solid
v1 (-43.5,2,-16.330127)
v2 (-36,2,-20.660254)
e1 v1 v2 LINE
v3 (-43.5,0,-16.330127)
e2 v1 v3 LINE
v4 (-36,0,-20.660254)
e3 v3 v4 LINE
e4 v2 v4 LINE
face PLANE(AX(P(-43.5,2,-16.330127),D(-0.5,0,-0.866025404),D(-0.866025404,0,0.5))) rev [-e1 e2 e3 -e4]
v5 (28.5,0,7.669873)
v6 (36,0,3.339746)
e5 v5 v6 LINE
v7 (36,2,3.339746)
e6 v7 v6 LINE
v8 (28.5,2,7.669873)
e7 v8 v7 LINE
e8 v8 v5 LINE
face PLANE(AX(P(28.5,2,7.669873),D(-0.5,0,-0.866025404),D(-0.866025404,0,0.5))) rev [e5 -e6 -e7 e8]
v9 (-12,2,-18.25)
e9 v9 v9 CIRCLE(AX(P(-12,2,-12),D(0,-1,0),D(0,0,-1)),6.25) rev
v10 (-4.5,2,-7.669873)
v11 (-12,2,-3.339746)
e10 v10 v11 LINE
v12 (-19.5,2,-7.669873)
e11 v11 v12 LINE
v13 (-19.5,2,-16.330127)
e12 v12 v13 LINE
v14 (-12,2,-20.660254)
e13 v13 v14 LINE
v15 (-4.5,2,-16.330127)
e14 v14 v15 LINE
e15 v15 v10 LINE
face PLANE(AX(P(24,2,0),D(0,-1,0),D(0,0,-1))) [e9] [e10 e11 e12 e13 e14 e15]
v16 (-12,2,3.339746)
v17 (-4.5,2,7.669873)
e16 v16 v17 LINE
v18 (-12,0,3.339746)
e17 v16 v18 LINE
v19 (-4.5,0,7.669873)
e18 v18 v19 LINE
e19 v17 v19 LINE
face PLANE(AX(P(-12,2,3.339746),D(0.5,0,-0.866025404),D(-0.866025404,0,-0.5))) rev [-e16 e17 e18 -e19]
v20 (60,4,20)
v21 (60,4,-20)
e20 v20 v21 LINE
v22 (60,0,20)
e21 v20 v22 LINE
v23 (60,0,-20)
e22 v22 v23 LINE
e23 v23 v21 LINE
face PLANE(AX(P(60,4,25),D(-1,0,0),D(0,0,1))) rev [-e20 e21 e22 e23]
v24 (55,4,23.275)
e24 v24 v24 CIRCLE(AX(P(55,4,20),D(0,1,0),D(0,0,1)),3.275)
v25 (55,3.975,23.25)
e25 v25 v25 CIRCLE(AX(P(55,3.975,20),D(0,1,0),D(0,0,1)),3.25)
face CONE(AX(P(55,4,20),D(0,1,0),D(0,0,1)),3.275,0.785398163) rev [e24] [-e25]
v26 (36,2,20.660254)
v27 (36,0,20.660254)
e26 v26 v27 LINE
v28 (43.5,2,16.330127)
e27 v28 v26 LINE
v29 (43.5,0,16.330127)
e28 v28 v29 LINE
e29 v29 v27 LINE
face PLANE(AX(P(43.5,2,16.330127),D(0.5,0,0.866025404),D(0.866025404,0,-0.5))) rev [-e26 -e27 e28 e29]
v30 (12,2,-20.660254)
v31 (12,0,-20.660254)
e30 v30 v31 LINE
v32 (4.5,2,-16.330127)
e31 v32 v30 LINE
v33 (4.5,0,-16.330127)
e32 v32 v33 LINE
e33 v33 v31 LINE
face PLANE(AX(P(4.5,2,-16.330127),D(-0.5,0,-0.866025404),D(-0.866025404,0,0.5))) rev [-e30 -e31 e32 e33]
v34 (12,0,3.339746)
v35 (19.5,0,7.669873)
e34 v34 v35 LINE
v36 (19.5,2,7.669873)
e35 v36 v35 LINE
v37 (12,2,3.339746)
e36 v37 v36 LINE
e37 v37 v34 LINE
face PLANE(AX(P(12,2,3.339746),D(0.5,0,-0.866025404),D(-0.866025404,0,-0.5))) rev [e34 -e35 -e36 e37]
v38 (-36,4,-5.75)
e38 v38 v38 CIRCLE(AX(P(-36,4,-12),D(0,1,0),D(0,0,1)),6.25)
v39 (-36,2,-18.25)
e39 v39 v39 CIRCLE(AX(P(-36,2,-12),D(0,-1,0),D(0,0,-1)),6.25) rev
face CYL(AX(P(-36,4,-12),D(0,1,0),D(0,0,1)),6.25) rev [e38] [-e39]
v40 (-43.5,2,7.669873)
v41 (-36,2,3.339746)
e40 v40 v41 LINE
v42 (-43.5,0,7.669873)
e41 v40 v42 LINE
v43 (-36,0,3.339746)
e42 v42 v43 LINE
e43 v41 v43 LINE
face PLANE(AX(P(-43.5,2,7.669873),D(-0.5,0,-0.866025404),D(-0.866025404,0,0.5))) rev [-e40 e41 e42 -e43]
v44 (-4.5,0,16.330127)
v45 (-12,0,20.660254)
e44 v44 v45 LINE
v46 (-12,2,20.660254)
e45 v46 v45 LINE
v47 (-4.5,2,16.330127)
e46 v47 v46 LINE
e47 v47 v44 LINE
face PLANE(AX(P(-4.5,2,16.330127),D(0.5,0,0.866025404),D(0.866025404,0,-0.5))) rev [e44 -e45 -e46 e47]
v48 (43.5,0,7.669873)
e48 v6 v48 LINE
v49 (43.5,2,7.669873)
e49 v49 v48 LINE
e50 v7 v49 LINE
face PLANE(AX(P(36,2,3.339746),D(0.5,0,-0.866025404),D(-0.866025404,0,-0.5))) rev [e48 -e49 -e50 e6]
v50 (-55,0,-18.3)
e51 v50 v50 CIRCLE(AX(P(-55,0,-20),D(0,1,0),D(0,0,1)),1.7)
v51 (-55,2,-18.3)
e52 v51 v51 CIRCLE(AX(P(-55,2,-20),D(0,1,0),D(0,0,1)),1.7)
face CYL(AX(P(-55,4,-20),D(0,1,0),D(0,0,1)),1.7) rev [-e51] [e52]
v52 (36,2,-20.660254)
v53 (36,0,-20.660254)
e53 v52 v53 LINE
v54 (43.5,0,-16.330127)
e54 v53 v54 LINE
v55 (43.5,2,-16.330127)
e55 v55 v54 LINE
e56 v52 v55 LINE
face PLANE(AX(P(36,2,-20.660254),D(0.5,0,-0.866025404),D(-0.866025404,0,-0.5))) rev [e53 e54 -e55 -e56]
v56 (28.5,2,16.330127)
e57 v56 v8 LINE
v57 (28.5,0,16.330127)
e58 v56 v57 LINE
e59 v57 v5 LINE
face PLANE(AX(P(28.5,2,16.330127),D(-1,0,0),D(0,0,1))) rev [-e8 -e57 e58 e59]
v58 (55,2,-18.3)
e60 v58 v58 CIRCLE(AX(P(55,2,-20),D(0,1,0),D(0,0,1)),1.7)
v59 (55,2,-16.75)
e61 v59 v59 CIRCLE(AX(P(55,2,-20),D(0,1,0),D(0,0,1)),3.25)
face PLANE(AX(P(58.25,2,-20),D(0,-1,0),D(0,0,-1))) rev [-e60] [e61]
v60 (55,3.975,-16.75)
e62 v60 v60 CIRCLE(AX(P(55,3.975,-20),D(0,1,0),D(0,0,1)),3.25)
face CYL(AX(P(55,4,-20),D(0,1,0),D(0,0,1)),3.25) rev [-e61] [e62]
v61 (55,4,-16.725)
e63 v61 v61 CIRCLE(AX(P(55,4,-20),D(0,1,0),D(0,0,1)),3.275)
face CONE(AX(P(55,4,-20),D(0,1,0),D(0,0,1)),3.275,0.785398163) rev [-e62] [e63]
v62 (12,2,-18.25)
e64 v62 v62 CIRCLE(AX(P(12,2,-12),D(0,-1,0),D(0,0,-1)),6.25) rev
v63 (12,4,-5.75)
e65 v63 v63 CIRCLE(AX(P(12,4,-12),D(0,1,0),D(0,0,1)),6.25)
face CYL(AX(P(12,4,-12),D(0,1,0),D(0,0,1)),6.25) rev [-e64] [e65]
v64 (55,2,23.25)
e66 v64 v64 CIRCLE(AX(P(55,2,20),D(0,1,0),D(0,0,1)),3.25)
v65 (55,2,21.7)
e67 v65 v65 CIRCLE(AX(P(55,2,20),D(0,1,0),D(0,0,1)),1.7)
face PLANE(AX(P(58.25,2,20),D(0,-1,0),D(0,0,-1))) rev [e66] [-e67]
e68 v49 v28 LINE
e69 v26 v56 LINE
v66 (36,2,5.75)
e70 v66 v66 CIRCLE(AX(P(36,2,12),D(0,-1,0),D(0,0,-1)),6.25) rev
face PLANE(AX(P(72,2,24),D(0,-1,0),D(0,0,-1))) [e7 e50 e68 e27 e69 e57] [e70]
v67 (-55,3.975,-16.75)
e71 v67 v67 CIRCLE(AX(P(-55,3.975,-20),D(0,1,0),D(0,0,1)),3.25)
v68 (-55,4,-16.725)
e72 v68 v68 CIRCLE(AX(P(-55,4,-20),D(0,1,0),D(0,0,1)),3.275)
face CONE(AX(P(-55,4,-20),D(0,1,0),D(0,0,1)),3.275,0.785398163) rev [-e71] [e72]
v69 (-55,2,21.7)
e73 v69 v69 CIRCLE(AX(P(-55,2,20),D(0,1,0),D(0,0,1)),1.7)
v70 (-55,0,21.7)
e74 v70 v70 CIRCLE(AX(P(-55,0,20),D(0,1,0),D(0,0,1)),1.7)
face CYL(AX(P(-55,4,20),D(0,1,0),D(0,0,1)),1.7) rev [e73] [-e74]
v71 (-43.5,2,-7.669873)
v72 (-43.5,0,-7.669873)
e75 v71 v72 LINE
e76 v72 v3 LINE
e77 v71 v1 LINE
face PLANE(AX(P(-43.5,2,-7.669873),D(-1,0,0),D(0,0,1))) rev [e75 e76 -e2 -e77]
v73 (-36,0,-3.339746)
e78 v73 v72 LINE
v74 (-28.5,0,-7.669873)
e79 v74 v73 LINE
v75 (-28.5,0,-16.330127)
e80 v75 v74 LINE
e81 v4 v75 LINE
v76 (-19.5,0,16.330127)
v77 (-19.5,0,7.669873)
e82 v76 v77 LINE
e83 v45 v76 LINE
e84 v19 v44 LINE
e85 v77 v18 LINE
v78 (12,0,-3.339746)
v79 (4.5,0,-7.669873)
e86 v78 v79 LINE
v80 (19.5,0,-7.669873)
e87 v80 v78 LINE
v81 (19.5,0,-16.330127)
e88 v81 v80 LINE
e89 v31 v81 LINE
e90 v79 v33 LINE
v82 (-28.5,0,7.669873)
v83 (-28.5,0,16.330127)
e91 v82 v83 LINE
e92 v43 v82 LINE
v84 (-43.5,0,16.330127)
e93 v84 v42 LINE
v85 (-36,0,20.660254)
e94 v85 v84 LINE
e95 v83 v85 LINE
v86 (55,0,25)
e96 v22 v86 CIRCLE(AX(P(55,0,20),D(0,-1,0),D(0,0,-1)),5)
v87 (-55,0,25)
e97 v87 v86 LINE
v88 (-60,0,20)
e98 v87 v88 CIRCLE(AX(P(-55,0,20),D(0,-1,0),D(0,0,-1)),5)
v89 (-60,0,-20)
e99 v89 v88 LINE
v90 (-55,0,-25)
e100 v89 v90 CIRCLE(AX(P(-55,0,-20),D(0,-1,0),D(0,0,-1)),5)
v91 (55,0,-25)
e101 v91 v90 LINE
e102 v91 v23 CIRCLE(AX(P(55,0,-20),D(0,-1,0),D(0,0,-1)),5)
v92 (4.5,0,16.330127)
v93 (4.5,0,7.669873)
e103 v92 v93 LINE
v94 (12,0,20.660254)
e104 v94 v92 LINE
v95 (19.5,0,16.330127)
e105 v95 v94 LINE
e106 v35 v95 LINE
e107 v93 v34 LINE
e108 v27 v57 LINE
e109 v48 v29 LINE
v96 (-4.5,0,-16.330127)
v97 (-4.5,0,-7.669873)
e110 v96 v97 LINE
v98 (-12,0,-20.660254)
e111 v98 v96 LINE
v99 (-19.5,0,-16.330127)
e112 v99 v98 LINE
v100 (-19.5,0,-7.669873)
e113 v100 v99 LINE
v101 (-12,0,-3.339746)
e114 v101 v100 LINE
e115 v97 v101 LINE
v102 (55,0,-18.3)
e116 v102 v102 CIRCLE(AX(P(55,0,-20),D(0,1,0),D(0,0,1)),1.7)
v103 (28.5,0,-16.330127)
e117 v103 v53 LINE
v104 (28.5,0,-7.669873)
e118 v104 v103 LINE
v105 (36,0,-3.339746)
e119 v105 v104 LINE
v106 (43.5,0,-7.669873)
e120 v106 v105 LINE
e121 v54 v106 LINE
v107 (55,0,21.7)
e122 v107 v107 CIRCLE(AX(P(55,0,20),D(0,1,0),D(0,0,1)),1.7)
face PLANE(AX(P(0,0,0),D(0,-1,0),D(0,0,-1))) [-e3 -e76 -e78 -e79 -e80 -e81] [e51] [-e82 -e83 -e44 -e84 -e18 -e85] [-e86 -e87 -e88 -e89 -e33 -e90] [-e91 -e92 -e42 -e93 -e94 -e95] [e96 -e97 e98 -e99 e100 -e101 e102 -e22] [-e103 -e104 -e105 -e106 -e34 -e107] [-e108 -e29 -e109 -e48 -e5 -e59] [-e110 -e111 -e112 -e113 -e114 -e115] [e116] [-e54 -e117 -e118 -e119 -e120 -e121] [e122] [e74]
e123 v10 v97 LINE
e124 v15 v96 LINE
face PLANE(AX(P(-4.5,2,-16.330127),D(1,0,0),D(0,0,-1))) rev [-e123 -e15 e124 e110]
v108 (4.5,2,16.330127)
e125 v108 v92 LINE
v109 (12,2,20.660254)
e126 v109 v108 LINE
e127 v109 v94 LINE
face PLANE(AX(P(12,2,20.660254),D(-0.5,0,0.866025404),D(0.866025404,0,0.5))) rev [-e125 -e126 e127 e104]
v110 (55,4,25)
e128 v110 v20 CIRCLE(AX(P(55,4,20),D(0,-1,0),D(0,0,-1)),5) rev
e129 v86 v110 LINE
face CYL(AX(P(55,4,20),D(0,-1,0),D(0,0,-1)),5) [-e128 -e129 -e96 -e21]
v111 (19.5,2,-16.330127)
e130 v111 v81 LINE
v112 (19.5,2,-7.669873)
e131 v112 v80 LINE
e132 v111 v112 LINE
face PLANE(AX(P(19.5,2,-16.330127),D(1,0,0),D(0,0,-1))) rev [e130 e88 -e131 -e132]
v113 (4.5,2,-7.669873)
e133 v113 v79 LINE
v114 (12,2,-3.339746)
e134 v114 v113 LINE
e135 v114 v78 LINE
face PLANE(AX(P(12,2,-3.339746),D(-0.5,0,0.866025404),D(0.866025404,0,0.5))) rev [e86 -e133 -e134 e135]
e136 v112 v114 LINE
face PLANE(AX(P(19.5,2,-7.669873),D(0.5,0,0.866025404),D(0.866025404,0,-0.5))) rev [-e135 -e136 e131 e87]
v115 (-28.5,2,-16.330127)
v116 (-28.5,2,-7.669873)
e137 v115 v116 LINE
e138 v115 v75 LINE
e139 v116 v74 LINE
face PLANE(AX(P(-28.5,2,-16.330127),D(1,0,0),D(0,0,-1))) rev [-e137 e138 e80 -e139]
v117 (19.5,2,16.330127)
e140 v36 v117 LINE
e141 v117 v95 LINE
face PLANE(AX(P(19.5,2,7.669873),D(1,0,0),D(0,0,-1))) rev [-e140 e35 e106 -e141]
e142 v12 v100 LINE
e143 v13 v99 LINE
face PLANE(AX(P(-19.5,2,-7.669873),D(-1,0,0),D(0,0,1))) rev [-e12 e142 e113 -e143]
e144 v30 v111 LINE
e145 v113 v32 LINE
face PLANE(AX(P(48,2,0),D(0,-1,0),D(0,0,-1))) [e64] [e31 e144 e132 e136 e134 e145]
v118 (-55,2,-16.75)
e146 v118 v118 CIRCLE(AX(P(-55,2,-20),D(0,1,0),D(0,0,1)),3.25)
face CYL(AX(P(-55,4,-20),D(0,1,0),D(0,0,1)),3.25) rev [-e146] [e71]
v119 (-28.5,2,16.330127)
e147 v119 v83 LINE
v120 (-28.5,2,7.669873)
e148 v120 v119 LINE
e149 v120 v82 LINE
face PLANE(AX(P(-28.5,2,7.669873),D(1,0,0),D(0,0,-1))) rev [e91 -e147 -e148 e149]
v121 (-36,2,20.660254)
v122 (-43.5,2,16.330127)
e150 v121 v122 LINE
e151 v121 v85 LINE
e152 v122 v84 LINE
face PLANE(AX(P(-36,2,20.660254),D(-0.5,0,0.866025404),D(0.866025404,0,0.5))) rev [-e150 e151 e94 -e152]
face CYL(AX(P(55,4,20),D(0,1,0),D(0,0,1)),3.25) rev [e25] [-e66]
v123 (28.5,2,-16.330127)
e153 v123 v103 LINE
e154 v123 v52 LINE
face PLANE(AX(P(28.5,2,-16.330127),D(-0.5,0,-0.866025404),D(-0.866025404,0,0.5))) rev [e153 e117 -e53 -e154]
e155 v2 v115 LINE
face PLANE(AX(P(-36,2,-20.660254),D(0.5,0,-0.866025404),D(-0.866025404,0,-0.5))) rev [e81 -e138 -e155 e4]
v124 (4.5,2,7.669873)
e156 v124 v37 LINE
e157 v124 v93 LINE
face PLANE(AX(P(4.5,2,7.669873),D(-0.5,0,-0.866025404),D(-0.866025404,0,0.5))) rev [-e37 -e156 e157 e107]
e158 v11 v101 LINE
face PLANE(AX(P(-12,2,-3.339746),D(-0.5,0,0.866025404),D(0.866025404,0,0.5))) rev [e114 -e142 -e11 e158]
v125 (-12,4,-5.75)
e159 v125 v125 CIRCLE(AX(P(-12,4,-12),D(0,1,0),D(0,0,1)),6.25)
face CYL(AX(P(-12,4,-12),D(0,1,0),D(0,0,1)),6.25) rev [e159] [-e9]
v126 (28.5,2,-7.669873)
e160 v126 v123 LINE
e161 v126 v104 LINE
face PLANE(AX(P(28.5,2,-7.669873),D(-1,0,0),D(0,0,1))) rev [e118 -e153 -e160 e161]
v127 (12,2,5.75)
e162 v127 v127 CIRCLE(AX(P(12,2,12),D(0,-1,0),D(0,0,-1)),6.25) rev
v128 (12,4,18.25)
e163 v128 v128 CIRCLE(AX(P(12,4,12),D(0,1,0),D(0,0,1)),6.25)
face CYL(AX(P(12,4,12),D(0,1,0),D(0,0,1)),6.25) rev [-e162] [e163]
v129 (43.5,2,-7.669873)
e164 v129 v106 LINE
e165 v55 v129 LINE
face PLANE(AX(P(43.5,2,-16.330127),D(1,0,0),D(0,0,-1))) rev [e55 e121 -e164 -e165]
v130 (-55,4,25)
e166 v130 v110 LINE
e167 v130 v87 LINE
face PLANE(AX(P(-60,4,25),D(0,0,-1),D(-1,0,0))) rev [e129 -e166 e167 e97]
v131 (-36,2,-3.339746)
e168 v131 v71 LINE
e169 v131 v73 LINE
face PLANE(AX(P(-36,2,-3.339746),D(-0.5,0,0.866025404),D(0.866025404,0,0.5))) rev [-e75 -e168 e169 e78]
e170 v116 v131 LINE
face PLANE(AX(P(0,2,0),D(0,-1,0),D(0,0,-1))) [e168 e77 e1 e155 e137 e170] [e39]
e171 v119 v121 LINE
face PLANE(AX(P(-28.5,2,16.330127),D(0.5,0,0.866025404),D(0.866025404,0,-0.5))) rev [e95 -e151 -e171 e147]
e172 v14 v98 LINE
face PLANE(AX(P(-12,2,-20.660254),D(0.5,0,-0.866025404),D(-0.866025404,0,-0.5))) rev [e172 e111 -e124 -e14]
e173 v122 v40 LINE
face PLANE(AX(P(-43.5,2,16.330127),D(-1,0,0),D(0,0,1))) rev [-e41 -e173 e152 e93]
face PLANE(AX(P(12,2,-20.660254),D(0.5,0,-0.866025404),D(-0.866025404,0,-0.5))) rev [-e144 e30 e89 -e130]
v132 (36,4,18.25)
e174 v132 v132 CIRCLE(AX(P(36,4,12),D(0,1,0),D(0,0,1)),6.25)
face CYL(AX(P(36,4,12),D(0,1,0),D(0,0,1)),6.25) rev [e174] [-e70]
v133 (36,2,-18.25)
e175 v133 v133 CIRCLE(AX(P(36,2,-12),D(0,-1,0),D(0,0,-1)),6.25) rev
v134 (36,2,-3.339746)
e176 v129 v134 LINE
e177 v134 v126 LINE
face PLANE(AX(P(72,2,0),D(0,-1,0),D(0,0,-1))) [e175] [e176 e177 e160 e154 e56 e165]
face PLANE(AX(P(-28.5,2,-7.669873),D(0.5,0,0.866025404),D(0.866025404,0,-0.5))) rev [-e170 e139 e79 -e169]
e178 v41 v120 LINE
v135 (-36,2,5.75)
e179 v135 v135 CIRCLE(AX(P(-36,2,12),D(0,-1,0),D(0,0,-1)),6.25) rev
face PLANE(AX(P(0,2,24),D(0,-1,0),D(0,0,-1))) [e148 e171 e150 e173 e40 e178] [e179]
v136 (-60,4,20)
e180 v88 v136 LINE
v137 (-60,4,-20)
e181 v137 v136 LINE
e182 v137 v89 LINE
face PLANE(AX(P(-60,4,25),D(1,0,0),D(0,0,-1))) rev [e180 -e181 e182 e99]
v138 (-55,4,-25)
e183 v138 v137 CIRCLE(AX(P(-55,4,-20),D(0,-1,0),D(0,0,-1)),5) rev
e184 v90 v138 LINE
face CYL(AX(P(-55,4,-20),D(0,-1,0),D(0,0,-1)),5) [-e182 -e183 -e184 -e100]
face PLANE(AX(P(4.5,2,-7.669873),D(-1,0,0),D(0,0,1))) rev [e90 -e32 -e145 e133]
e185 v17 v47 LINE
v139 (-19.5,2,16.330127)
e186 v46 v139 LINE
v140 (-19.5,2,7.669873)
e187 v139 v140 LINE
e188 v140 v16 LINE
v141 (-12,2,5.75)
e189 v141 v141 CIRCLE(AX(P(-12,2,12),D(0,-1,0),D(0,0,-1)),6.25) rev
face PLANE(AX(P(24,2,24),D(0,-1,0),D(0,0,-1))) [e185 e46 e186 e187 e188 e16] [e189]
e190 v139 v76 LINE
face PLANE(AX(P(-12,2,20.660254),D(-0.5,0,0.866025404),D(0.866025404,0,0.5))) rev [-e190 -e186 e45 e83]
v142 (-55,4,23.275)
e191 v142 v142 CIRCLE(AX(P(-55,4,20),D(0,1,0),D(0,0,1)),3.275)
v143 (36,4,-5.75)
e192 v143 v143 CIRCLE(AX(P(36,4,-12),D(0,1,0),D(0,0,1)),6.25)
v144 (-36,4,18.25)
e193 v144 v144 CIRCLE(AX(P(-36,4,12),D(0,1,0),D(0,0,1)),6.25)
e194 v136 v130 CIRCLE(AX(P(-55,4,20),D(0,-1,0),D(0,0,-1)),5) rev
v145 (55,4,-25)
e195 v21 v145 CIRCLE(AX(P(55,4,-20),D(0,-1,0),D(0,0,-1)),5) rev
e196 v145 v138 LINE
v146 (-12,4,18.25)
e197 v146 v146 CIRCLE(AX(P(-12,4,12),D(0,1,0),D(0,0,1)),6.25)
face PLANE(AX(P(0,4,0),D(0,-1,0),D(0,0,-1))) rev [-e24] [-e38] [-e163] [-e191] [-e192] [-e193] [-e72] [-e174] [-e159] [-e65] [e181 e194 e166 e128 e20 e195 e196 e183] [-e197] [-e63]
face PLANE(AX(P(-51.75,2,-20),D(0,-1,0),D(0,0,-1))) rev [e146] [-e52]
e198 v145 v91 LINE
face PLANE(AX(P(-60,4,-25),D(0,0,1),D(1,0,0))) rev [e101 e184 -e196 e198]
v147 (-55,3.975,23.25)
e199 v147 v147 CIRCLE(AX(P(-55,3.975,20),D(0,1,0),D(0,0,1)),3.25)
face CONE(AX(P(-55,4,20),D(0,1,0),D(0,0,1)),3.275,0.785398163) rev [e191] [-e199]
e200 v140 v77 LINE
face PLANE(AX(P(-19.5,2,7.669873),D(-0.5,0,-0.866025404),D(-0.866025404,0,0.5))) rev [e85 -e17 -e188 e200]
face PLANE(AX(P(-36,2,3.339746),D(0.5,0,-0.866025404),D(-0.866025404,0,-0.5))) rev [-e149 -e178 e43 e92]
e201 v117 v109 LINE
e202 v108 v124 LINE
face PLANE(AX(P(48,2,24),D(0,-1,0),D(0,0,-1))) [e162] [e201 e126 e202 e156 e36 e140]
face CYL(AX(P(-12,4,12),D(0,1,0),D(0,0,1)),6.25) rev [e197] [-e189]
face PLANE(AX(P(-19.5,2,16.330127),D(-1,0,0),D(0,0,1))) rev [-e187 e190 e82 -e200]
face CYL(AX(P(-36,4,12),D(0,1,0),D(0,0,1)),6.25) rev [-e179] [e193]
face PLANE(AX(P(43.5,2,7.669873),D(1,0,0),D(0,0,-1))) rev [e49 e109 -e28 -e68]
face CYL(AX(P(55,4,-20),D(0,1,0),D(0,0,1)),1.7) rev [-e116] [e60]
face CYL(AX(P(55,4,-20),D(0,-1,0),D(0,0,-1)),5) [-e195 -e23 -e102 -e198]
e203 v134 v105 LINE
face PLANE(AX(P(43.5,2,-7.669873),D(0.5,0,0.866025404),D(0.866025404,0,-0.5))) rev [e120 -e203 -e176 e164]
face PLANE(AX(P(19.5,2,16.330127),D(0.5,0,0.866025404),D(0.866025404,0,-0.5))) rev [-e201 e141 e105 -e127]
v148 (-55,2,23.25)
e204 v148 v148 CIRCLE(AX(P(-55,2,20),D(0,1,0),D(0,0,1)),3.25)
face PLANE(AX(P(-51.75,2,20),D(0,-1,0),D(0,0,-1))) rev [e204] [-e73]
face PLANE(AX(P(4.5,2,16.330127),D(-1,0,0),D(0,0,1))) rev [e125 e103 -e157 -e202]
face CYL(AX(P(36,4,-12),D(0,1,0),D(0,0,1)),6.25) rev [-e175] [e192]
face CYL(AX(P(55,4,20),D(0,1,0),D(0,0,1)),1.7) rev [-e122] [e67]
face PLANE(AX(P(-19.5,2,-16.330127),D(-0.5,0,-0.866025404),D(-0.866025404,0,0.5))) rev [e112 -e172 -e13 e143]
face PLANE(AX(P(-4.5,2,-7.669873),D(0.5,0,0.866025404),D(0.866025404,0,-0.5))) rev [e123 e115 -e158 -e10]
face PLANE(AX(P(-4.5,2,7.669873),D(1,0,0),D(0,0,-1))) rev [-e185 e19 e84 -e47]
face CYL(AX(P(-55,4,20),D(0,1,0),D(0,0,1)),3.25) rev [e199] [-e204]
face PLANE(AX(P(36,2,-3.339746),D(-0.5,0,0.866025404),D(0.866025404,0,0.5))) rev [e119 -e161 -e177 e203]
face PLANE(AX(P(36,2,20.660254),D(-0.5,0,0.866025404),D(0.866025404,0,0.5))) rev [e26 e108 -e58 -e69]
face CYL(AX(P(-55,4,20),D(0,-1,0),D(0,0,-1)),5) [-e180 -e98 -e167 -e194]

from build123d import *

# Parameters (mm, degrees)
SKETCH1_W               = 120
SKETCH1_H               = 50
BODY_DEPTH              = 4
EDGE_FILLETS_R          = 5
GX12_HOLE_D             = 12.5
GX12_NUT_CUT_DEPTH      = 2
GX12_PATTERN_COUNT      = 4
GX12_PATTERN_PITCH      = 24
GX12_PATTERN_COUNT_DIR2 = 2
GX12_PATTERN_PITCH_DIR2 = 24


# Read off the part's stored shape, not the designer's step: mounting_holes
with BuildPart() as part:
    # Sketch1 → body (new body)
    with BuildSketch(Plane(origin=(0, 0, 0), x_dir=(1, 0, 0), z_dir=(0, 1, 0))):
        Rectangle(SKETCH1_W, SKETCH1_H)
    extrude(amount=BODY_DEPTH)

    # mounting_holes outline → mounting_holes (revolve, cut)
    with BuildSketch(Plane(origin=(55, 0, 20), x_dir=(1, 0, 0), z_dir=(0, 0, 1))):
        Polygon((0, 0), (1.7, 0), (1.7, 2), (3.25, 2), (3.25, 3.975), (3.275, 4), (0, 4), align=None)
    revolve(axis=Axis((55, 0, 20), (0, 1, 0)), mode=Mode.SUBTRACT)

    # mounting_holes 2 outline → mounting_holes 2 (revolve, cut)
    with BuildSketch(Plane(origin=(-55, 0, -20), x_dir=(1, 0, 0), z_dir=(0, 0, 1))):
        Polygon((0, 4), (0, 0), (1.7, 0), (1.7, 2), (3.25, 2), (3.25, 3.975), (3.275, 4), align=None)
    revolve(axis=Axis((-55, 0, -20), (0, 1, 0)), mode=Mode.SUBTRACT)

    # mounting_holes 3 outline → mounting_holes 3 (revolve, cut)
    with BuildSketch(Plane(origin=(55, 0, -20), x_dir=(1, 0, 0), z_dir=(0, 0, 1))):
        Polygon((0, 4), (0, 0), (1.7, 0), (1.7, 2), (3.25, 2), (3.25, 3.975), (3.275, 4), align=None)
    revolve(axis=Axis((55, 0, -20), (0, 1, 0)), mode=Mode.SUBTRACT)

    # mounting_holes 4 outline → mounting_holes 4 (revolve, cut)
    with BuildSketch(Plane(origin=(-55, 0, 20), x_dir=(1, 0, 0), z_dir=(0, 0, 1))):
        Polygon((0, 4), (0, 0), (1.7, 0), (1.7, 2), (3.25, 2), (3.25, 3.975), (3.275, 4), align=None)
    revolve(axis=Axis((-55, 0, 20), (0, 1, 0)), mode=Mode.SUBTRACT)

    # edge_fillets
    edge_fillets_edges = [part.edges().sort_by_distance(p)[0] for p in [
        (60, 2, 25),
        (-60, 2, 25),
        (-60, 2, -25),
        (60, 2, -25),
    ]]
    fillet(edge_fillets_edges, radius=EDGE_FILLETS_R)

    # gx12_hole (through all)
    with Locations(Plane(origin=(0, 4, 0), x_dir=(1, 0, 0), z_dir=(0, 1, 0))):
        with Locations((-36, 12)):
            gx12_hole = Hole(GX12_HOLE_D / 2)

    # Sketch6 → gx12_nut_cut (cut)
    with BuildSketch(Plane.XZ):
        Polygon((-36, -3.339745962), (-43.5, -7.669872981), (-43.5, -16.330127019), (-36, -20.660254038), (-28.5, -16.330127019), (-28.5, -7.669872981), align=None)
    gx12_nut_cut = extrude(amount=-GX12_NUT_CUT_DEPTH, mode=Mode.SUBTRACT)

    # gx12_pattern: gx12_hole, gx12_nut_cut 4 × 2
    with Locations(*[(i * GX12_PATTERN_PITCH, 0, j * GX12_PATTERN_PITCH_DIR2) for i in range(GX12_PATTERN_COUNT) for j in range(GX12_PATTERN_COUNT_DIR2) if (i, j) != (0, 0)]):
        add(gx12_hole, mode=Mode.SUBTRACT)
        add(gx12_nut_cut, mode=Mode.SUBTRACT)


solid = part.part
